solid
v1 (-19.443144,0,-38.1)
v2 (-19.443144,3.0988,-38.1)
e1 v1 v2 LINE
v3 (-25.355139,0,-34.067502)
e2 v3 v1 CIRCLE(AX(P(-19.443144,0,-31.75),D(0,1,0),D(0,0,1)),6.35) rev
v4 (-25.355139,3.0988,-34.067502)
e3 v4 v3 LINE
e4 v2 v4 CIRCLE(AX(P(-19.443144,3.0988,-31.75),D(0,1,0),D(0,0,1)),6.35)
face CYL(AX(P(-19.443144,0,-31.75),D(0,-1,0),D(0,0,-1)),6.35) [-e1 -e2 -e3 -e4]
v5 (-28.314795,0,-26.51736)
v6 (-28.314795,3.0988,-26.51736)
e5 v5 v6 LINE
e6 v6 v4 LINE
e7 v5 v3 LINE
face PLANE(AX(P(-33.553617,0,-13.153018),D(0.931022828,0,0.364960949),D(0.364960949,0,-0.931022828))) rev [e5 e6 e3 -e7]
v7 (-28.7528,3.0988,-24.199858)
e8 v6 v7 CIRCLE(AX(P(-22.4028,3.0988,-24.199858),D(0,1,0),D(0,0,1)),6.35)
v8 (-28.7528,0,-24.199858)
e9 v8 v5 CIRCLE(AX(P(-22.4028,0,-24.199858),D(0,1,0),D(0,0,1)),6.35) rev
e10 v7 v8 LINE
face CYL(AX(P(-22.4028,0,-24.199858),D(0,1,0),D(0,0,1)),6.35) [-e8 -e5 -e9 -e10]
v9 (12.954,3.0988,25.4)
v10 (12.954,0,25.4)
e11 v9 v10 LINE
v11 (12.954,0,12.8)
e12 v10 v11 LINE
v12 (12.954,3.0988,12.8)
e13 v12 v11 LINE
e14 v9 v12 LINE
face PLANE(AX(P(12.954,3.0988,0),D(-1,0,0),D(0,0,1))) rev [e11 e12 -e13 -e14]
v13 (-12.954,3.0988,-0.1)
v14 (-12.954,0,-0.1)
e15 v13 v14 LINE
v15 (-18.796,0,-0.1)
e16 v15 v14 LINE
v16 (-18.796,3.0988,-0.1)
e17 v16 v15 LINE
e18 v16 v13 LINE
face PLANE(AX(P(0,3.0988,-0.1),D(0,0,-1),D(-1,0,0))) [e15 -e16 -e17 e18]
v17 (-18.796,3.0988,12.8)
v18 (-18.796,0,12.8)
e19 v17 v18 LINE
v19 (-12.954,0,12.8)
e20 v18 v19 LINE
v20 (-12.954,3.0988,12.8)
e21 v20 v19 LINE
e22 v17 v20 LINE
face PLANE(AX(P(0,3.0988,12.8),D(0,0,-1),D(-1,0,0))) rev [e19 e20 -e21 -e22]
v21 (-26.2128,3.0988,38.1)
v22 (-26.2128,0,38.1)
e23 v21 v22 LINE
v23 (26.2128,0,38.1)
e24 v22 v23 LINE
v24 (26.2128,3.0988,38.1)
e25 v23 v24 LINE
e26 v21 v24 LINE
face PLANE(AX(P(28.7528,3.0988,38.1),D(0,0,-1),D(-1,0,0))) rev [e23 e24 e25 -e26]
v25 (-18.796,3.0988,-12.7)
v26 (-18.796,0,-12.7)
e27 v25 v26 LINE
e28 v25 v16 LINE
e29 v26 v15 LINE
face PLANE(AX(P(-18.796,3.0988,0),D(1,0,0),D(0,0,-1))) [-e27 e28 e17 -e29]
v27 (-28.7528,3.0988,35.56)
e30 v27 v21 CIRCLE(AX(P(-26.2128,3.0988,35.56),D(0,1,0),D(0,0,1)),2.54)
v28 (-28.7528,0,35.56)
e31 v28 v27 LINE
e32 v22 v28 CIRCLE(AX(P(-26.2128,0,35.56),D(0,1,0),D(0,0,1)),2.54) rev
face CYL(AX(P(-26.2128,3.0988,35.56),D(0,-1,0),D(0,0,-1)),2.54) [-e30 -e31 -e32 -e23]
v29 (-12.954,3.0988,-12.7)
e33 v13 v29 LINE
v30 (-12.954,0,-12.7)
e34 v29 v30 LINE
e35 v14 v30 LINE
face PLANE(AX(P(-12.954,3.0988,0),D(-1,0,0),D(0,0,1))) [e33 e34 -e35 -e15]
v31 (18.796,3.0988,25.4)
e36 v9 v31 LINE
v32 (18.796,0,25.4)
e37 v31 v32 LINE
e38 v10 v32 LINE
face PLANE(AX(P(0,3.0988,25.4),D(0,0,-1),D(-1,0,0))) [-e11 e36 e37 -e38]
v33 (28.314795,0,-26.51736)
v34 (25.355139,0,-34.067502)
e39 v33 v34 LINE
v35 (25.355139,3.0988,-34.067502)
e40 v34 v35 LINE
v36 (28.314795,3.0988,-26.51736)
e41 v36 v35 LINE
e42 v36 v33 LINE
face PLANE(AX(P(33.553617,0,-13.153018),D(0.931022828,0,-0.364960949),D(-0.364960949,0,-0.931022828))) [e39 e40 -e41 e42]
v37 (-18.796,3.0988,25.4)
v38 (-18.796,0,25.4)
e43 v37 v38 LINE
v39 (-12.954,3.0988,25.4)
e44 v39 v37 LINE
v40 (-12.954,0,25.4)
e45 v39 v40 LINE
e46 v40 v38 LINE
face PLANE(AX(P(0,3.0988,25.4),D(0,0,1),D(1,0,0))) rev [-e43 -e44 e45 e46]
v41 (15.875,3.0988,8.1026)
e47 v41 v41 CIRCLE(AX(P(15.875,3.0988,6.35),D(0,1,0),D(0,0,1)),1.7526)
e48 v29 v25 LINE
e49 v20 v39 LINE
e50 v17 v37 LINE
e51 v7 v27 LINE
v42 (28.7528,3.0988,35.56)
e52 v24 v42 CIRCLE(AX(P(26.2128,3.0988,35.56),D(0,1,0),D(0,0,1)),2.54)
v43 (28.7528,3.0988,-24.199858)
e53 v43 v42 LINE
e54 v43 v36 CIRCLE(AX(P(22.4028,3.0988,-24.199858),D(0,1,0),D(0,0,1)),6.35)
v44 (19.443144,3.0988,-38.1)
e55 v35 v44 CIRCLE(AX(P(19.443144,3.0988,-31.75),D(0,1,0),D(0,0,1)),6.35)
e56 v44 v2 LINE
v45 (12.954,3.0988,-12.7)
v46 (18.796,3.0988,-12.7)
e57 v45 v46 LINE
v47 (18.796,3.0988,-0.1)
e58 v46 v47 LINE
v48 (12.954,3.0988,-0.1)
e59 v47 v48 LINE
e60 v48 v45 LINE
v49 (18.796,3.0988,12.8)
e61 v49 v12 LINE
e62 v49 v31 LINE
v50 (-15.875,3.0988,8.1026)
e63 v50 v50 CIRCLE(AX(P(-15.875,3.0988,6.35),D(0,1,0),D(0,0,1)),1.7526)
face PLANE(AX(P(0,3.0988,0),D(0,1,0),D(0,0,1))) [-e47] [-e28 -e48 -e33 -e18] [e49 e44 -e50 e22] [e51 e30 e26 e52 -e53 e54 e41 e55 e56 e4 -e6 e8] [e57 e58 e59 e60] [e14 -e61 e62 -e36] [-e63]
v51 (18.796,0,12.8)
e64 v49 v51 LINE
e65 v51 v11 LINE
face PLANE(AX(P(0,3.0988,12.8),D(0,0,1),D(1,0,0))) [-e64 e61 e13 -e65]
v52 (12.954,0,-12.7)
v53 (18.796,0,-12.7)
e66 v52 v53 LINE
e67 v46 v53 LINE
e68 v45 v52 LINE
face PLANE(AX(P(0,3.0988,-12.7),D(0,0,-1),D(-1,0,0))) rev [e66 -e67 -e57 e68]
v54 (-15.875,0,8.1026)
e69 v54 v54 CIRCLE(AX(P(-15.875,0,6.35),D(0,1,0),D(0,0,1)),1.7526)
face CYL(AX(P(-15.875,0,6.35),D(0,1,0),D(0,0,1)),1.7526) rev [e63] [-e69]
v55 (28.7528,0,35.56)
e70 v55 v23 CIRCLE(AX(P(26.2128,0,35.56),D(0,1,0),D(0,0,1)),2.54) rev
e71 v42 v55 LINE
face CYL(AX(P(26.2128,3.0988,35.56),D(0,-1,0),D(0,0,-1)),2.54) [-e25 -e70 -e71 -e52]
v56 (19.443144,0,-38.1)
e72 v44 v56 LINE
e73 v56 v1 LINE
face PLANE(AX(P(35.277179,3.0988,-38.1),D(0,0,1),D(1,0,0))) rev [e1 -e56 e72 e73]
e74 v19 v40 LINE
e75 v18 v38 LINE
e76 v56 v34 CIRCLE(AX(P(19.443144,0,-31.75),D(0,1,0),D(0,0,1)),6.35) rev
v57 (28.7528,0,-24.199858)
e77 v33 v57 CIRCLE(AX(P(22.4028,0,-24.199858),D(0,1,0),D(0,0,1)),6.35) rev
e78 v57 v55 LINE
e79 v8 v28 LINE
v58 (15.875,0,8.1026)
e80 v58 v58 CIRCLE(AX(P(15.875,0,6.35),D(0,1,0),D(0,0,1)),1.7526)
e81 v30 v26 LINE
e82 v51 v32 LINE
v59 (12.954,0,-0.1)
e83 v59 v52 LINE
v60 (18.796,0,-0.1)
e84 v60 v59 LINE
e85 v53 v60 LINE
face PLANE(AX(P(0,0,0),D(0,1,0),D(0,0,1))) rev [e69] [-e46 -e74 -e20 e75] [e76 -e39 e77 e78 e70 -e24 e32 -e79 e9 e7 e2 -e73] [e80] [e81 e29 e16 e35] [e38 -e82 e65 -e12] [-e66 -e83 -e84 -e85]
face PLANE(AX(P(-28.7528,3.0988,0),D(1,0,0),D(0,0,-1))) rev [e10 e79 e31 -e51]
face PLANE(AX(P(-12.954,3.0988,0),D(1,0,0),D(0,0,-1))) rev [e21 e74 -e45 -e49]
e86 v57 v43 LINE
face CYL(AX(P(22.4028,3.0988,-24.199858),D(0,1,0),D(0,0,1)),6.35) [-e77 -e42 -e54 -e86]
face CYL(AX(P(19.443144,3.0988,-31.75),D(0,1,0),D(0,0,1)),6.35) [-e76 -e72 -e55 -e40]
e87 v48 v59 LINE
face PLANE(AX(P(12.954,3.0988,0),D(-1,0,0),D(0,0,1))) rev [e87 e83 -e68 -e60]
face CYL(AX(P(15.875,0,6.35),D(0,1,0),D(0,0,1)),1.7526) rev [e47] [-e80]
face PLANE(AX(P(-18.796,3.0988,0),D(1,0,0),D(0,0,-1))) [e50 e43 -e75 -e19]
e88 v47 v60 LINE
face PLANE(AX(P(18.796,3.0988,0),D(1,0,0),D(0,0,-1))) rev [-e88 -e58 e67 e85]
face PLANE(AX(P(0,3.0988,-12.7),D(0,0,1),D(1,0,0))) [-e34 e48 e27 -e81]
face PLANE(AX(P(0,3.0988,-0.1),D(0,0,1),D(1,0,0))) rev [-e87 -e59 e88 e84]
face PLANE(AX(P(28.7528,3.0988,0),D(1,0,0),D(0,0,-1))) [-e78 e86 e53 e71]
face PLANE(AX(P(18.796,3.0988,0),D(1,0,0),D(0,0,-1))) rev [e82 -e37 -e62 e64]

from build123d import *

# Parameters (mm, degrees)
SKETCH1_W           = 5.842
SKETCH1_H           = 12.6
BOSS_EXTRUDE1_DEPTH = 3.0988
SKETCH2_R           = 1.7526
CUT_EXTRUDE1_DEPTH  = 59.454820753
FILLET1_R           = 6.35
SKETCH3_W           = 58.835231844
SKETCH3_H           = 12.7
CUT_EXTRUDE2_DEPTH  = 59.454820753
FILLET2_R           = 2.54
SKETCH4_W           = 76.889579371
SKETCH4_H           = 12.7
CUT_EXTRUDE3_DEPTH  = 59.454820895
FILLET3_R           = 6.35


with BuildPart() as part:
    # Sketch1 → Boss-Extrude1 (new body)
    with BuildSketch(Plane(origin=(0, 0, 0), x_dir=(1, 0, 0), z_dir=(0, 1, 0))):
        Polygon((-12.954, -50.8), (12.954, -50.8), (16.0528, -50.8), (28.7528, -50.8), (28.7528, 50.8), (16.0528, 50.8), (12.954, 50.8), (-12.954, 50.8), (-16.0528, 50.8), (-28.7528, 50.8), (-28.7528, -50.8), (-16.0528, -50.8), align=None)
        with Locations((-15.875, -19.1)):
            Rectangle(SKETCH1_W, SKETCH1_H, mode=Mode.SUBTRACT)
        with Locations((15.875, -19.1)):
            Rectangle(SKETCH1_W, SKETCH1_H, mode=Mode.SUBTRACT)
        with Locations((-15.875, 6.4)):
            Rectangle(SKETCH1_W, SKETCH1_H, mode=Mode.SUBTRACT)
        with Locations((15.875, 6.4)):
            Rectangle(SKETCH1_W, SKETCH1_H, mode=Mode.SUBTRACT)
    extrude(amount=BOSS_EXTRUDE1_DEPTH)

    # Sketch2 → Cut-Extrude1 (cut, through all)
    with BuildSketch(Plane(origin=(0, 3.0988, 0), x_dir=(1, 0, 0), z_dir=(0, 1, 0))):
        Polygon((-28.7528, -50.8), (-18.796, -50.8), (-28.7528, -38.1), align=None)
        Polygon((28.7528, -38.1), (18.796, -50.8), (28.7528, -50.8), align=None)
        Polygon((-28.7528, 50.8), (-28.7528, 25.4), (-18.796, 50.8), align=None)
        Polygon((18.796, 50.8), (28.7528, 25.4), (28.7528, 50.8), align=None)
        with Locations((-15.875, -6.35)):
            Circle(SKETCH2_R)
        with Locations((15.875, -6.35)):
            Circle(SKETCH2_R)
    extrude(amount=-CUT_EXTRUDE1_DEPTH, mode=Mode.SUBTRACT)

    # Fillet1
    fillet1_edges = [part.edges().sort_by_distance(p)[0] for p in [
        (18.796, 1.5494, 50.8),
        (-18.796, 1.5494, 50.8),
        (-28.7528, 1.5494, 38.1),
        (-28.7528, 1.5494, -25.4),
        (-18.796, 1.5494, -50.8),
        (18.796, 1.5494, -50.8),
        (28.7528, 1.5494, -25.4),
        (28.7528, 1.5494, 38.1),
    ]]
    fillet(fillet1_edges, radius=FILLET1_R)

    # Sketch3 → Cut-Extrude2 (cut, through all)
    with BuildSketch(Plane(origin=(0, 0, 0), x_dir=(-1, 0, 0), z_dir=(0, -1, 0))):
        with Locations((0.664815922, -44.45)):
            Rectangle(SKETCH3_W, SKETCH3_H)
    extrude(amount=-CUT_EXTRUDE2_DEPTH, mode=Mode.SUBTRACT)

    # Fillet2
    fillet2_edges = [part.edges().sort_by_distance(p)[0] for p in [
        (-28.362298152, 1.5494, 38.1),
        (28.362298152, 1.5494, 38.1),
    ]]
    fillet(fillet2_edges, radius=FILLET2_R)

    # Sketch4 → Cut-Extrude3 (cut, through all)
    with BuildSketch(Plane(origin=(0, 0, 0), x_dir=(-1, 0, 0), z_dir=(0, -1, 0))):
        with Locations((3.167610928, 44.45)):
            Rectangle(SKETCH4_W, SKETCH4_H)
    extrude(amount=-CUT_EXTRUDE3_DEPTH, mode=Mode.SUBTRACT)

    # Fillet3
    fillet3_edges = [part.edges().sort_by_distance(p)[0] for p in [
        (23.7744, 1.5494, -38.1),
        (-23.7744, 1.5494, -38.1),
    ]]
    fillet(fillet3_edges, radius=FILLET3_R)


solid = part.part
